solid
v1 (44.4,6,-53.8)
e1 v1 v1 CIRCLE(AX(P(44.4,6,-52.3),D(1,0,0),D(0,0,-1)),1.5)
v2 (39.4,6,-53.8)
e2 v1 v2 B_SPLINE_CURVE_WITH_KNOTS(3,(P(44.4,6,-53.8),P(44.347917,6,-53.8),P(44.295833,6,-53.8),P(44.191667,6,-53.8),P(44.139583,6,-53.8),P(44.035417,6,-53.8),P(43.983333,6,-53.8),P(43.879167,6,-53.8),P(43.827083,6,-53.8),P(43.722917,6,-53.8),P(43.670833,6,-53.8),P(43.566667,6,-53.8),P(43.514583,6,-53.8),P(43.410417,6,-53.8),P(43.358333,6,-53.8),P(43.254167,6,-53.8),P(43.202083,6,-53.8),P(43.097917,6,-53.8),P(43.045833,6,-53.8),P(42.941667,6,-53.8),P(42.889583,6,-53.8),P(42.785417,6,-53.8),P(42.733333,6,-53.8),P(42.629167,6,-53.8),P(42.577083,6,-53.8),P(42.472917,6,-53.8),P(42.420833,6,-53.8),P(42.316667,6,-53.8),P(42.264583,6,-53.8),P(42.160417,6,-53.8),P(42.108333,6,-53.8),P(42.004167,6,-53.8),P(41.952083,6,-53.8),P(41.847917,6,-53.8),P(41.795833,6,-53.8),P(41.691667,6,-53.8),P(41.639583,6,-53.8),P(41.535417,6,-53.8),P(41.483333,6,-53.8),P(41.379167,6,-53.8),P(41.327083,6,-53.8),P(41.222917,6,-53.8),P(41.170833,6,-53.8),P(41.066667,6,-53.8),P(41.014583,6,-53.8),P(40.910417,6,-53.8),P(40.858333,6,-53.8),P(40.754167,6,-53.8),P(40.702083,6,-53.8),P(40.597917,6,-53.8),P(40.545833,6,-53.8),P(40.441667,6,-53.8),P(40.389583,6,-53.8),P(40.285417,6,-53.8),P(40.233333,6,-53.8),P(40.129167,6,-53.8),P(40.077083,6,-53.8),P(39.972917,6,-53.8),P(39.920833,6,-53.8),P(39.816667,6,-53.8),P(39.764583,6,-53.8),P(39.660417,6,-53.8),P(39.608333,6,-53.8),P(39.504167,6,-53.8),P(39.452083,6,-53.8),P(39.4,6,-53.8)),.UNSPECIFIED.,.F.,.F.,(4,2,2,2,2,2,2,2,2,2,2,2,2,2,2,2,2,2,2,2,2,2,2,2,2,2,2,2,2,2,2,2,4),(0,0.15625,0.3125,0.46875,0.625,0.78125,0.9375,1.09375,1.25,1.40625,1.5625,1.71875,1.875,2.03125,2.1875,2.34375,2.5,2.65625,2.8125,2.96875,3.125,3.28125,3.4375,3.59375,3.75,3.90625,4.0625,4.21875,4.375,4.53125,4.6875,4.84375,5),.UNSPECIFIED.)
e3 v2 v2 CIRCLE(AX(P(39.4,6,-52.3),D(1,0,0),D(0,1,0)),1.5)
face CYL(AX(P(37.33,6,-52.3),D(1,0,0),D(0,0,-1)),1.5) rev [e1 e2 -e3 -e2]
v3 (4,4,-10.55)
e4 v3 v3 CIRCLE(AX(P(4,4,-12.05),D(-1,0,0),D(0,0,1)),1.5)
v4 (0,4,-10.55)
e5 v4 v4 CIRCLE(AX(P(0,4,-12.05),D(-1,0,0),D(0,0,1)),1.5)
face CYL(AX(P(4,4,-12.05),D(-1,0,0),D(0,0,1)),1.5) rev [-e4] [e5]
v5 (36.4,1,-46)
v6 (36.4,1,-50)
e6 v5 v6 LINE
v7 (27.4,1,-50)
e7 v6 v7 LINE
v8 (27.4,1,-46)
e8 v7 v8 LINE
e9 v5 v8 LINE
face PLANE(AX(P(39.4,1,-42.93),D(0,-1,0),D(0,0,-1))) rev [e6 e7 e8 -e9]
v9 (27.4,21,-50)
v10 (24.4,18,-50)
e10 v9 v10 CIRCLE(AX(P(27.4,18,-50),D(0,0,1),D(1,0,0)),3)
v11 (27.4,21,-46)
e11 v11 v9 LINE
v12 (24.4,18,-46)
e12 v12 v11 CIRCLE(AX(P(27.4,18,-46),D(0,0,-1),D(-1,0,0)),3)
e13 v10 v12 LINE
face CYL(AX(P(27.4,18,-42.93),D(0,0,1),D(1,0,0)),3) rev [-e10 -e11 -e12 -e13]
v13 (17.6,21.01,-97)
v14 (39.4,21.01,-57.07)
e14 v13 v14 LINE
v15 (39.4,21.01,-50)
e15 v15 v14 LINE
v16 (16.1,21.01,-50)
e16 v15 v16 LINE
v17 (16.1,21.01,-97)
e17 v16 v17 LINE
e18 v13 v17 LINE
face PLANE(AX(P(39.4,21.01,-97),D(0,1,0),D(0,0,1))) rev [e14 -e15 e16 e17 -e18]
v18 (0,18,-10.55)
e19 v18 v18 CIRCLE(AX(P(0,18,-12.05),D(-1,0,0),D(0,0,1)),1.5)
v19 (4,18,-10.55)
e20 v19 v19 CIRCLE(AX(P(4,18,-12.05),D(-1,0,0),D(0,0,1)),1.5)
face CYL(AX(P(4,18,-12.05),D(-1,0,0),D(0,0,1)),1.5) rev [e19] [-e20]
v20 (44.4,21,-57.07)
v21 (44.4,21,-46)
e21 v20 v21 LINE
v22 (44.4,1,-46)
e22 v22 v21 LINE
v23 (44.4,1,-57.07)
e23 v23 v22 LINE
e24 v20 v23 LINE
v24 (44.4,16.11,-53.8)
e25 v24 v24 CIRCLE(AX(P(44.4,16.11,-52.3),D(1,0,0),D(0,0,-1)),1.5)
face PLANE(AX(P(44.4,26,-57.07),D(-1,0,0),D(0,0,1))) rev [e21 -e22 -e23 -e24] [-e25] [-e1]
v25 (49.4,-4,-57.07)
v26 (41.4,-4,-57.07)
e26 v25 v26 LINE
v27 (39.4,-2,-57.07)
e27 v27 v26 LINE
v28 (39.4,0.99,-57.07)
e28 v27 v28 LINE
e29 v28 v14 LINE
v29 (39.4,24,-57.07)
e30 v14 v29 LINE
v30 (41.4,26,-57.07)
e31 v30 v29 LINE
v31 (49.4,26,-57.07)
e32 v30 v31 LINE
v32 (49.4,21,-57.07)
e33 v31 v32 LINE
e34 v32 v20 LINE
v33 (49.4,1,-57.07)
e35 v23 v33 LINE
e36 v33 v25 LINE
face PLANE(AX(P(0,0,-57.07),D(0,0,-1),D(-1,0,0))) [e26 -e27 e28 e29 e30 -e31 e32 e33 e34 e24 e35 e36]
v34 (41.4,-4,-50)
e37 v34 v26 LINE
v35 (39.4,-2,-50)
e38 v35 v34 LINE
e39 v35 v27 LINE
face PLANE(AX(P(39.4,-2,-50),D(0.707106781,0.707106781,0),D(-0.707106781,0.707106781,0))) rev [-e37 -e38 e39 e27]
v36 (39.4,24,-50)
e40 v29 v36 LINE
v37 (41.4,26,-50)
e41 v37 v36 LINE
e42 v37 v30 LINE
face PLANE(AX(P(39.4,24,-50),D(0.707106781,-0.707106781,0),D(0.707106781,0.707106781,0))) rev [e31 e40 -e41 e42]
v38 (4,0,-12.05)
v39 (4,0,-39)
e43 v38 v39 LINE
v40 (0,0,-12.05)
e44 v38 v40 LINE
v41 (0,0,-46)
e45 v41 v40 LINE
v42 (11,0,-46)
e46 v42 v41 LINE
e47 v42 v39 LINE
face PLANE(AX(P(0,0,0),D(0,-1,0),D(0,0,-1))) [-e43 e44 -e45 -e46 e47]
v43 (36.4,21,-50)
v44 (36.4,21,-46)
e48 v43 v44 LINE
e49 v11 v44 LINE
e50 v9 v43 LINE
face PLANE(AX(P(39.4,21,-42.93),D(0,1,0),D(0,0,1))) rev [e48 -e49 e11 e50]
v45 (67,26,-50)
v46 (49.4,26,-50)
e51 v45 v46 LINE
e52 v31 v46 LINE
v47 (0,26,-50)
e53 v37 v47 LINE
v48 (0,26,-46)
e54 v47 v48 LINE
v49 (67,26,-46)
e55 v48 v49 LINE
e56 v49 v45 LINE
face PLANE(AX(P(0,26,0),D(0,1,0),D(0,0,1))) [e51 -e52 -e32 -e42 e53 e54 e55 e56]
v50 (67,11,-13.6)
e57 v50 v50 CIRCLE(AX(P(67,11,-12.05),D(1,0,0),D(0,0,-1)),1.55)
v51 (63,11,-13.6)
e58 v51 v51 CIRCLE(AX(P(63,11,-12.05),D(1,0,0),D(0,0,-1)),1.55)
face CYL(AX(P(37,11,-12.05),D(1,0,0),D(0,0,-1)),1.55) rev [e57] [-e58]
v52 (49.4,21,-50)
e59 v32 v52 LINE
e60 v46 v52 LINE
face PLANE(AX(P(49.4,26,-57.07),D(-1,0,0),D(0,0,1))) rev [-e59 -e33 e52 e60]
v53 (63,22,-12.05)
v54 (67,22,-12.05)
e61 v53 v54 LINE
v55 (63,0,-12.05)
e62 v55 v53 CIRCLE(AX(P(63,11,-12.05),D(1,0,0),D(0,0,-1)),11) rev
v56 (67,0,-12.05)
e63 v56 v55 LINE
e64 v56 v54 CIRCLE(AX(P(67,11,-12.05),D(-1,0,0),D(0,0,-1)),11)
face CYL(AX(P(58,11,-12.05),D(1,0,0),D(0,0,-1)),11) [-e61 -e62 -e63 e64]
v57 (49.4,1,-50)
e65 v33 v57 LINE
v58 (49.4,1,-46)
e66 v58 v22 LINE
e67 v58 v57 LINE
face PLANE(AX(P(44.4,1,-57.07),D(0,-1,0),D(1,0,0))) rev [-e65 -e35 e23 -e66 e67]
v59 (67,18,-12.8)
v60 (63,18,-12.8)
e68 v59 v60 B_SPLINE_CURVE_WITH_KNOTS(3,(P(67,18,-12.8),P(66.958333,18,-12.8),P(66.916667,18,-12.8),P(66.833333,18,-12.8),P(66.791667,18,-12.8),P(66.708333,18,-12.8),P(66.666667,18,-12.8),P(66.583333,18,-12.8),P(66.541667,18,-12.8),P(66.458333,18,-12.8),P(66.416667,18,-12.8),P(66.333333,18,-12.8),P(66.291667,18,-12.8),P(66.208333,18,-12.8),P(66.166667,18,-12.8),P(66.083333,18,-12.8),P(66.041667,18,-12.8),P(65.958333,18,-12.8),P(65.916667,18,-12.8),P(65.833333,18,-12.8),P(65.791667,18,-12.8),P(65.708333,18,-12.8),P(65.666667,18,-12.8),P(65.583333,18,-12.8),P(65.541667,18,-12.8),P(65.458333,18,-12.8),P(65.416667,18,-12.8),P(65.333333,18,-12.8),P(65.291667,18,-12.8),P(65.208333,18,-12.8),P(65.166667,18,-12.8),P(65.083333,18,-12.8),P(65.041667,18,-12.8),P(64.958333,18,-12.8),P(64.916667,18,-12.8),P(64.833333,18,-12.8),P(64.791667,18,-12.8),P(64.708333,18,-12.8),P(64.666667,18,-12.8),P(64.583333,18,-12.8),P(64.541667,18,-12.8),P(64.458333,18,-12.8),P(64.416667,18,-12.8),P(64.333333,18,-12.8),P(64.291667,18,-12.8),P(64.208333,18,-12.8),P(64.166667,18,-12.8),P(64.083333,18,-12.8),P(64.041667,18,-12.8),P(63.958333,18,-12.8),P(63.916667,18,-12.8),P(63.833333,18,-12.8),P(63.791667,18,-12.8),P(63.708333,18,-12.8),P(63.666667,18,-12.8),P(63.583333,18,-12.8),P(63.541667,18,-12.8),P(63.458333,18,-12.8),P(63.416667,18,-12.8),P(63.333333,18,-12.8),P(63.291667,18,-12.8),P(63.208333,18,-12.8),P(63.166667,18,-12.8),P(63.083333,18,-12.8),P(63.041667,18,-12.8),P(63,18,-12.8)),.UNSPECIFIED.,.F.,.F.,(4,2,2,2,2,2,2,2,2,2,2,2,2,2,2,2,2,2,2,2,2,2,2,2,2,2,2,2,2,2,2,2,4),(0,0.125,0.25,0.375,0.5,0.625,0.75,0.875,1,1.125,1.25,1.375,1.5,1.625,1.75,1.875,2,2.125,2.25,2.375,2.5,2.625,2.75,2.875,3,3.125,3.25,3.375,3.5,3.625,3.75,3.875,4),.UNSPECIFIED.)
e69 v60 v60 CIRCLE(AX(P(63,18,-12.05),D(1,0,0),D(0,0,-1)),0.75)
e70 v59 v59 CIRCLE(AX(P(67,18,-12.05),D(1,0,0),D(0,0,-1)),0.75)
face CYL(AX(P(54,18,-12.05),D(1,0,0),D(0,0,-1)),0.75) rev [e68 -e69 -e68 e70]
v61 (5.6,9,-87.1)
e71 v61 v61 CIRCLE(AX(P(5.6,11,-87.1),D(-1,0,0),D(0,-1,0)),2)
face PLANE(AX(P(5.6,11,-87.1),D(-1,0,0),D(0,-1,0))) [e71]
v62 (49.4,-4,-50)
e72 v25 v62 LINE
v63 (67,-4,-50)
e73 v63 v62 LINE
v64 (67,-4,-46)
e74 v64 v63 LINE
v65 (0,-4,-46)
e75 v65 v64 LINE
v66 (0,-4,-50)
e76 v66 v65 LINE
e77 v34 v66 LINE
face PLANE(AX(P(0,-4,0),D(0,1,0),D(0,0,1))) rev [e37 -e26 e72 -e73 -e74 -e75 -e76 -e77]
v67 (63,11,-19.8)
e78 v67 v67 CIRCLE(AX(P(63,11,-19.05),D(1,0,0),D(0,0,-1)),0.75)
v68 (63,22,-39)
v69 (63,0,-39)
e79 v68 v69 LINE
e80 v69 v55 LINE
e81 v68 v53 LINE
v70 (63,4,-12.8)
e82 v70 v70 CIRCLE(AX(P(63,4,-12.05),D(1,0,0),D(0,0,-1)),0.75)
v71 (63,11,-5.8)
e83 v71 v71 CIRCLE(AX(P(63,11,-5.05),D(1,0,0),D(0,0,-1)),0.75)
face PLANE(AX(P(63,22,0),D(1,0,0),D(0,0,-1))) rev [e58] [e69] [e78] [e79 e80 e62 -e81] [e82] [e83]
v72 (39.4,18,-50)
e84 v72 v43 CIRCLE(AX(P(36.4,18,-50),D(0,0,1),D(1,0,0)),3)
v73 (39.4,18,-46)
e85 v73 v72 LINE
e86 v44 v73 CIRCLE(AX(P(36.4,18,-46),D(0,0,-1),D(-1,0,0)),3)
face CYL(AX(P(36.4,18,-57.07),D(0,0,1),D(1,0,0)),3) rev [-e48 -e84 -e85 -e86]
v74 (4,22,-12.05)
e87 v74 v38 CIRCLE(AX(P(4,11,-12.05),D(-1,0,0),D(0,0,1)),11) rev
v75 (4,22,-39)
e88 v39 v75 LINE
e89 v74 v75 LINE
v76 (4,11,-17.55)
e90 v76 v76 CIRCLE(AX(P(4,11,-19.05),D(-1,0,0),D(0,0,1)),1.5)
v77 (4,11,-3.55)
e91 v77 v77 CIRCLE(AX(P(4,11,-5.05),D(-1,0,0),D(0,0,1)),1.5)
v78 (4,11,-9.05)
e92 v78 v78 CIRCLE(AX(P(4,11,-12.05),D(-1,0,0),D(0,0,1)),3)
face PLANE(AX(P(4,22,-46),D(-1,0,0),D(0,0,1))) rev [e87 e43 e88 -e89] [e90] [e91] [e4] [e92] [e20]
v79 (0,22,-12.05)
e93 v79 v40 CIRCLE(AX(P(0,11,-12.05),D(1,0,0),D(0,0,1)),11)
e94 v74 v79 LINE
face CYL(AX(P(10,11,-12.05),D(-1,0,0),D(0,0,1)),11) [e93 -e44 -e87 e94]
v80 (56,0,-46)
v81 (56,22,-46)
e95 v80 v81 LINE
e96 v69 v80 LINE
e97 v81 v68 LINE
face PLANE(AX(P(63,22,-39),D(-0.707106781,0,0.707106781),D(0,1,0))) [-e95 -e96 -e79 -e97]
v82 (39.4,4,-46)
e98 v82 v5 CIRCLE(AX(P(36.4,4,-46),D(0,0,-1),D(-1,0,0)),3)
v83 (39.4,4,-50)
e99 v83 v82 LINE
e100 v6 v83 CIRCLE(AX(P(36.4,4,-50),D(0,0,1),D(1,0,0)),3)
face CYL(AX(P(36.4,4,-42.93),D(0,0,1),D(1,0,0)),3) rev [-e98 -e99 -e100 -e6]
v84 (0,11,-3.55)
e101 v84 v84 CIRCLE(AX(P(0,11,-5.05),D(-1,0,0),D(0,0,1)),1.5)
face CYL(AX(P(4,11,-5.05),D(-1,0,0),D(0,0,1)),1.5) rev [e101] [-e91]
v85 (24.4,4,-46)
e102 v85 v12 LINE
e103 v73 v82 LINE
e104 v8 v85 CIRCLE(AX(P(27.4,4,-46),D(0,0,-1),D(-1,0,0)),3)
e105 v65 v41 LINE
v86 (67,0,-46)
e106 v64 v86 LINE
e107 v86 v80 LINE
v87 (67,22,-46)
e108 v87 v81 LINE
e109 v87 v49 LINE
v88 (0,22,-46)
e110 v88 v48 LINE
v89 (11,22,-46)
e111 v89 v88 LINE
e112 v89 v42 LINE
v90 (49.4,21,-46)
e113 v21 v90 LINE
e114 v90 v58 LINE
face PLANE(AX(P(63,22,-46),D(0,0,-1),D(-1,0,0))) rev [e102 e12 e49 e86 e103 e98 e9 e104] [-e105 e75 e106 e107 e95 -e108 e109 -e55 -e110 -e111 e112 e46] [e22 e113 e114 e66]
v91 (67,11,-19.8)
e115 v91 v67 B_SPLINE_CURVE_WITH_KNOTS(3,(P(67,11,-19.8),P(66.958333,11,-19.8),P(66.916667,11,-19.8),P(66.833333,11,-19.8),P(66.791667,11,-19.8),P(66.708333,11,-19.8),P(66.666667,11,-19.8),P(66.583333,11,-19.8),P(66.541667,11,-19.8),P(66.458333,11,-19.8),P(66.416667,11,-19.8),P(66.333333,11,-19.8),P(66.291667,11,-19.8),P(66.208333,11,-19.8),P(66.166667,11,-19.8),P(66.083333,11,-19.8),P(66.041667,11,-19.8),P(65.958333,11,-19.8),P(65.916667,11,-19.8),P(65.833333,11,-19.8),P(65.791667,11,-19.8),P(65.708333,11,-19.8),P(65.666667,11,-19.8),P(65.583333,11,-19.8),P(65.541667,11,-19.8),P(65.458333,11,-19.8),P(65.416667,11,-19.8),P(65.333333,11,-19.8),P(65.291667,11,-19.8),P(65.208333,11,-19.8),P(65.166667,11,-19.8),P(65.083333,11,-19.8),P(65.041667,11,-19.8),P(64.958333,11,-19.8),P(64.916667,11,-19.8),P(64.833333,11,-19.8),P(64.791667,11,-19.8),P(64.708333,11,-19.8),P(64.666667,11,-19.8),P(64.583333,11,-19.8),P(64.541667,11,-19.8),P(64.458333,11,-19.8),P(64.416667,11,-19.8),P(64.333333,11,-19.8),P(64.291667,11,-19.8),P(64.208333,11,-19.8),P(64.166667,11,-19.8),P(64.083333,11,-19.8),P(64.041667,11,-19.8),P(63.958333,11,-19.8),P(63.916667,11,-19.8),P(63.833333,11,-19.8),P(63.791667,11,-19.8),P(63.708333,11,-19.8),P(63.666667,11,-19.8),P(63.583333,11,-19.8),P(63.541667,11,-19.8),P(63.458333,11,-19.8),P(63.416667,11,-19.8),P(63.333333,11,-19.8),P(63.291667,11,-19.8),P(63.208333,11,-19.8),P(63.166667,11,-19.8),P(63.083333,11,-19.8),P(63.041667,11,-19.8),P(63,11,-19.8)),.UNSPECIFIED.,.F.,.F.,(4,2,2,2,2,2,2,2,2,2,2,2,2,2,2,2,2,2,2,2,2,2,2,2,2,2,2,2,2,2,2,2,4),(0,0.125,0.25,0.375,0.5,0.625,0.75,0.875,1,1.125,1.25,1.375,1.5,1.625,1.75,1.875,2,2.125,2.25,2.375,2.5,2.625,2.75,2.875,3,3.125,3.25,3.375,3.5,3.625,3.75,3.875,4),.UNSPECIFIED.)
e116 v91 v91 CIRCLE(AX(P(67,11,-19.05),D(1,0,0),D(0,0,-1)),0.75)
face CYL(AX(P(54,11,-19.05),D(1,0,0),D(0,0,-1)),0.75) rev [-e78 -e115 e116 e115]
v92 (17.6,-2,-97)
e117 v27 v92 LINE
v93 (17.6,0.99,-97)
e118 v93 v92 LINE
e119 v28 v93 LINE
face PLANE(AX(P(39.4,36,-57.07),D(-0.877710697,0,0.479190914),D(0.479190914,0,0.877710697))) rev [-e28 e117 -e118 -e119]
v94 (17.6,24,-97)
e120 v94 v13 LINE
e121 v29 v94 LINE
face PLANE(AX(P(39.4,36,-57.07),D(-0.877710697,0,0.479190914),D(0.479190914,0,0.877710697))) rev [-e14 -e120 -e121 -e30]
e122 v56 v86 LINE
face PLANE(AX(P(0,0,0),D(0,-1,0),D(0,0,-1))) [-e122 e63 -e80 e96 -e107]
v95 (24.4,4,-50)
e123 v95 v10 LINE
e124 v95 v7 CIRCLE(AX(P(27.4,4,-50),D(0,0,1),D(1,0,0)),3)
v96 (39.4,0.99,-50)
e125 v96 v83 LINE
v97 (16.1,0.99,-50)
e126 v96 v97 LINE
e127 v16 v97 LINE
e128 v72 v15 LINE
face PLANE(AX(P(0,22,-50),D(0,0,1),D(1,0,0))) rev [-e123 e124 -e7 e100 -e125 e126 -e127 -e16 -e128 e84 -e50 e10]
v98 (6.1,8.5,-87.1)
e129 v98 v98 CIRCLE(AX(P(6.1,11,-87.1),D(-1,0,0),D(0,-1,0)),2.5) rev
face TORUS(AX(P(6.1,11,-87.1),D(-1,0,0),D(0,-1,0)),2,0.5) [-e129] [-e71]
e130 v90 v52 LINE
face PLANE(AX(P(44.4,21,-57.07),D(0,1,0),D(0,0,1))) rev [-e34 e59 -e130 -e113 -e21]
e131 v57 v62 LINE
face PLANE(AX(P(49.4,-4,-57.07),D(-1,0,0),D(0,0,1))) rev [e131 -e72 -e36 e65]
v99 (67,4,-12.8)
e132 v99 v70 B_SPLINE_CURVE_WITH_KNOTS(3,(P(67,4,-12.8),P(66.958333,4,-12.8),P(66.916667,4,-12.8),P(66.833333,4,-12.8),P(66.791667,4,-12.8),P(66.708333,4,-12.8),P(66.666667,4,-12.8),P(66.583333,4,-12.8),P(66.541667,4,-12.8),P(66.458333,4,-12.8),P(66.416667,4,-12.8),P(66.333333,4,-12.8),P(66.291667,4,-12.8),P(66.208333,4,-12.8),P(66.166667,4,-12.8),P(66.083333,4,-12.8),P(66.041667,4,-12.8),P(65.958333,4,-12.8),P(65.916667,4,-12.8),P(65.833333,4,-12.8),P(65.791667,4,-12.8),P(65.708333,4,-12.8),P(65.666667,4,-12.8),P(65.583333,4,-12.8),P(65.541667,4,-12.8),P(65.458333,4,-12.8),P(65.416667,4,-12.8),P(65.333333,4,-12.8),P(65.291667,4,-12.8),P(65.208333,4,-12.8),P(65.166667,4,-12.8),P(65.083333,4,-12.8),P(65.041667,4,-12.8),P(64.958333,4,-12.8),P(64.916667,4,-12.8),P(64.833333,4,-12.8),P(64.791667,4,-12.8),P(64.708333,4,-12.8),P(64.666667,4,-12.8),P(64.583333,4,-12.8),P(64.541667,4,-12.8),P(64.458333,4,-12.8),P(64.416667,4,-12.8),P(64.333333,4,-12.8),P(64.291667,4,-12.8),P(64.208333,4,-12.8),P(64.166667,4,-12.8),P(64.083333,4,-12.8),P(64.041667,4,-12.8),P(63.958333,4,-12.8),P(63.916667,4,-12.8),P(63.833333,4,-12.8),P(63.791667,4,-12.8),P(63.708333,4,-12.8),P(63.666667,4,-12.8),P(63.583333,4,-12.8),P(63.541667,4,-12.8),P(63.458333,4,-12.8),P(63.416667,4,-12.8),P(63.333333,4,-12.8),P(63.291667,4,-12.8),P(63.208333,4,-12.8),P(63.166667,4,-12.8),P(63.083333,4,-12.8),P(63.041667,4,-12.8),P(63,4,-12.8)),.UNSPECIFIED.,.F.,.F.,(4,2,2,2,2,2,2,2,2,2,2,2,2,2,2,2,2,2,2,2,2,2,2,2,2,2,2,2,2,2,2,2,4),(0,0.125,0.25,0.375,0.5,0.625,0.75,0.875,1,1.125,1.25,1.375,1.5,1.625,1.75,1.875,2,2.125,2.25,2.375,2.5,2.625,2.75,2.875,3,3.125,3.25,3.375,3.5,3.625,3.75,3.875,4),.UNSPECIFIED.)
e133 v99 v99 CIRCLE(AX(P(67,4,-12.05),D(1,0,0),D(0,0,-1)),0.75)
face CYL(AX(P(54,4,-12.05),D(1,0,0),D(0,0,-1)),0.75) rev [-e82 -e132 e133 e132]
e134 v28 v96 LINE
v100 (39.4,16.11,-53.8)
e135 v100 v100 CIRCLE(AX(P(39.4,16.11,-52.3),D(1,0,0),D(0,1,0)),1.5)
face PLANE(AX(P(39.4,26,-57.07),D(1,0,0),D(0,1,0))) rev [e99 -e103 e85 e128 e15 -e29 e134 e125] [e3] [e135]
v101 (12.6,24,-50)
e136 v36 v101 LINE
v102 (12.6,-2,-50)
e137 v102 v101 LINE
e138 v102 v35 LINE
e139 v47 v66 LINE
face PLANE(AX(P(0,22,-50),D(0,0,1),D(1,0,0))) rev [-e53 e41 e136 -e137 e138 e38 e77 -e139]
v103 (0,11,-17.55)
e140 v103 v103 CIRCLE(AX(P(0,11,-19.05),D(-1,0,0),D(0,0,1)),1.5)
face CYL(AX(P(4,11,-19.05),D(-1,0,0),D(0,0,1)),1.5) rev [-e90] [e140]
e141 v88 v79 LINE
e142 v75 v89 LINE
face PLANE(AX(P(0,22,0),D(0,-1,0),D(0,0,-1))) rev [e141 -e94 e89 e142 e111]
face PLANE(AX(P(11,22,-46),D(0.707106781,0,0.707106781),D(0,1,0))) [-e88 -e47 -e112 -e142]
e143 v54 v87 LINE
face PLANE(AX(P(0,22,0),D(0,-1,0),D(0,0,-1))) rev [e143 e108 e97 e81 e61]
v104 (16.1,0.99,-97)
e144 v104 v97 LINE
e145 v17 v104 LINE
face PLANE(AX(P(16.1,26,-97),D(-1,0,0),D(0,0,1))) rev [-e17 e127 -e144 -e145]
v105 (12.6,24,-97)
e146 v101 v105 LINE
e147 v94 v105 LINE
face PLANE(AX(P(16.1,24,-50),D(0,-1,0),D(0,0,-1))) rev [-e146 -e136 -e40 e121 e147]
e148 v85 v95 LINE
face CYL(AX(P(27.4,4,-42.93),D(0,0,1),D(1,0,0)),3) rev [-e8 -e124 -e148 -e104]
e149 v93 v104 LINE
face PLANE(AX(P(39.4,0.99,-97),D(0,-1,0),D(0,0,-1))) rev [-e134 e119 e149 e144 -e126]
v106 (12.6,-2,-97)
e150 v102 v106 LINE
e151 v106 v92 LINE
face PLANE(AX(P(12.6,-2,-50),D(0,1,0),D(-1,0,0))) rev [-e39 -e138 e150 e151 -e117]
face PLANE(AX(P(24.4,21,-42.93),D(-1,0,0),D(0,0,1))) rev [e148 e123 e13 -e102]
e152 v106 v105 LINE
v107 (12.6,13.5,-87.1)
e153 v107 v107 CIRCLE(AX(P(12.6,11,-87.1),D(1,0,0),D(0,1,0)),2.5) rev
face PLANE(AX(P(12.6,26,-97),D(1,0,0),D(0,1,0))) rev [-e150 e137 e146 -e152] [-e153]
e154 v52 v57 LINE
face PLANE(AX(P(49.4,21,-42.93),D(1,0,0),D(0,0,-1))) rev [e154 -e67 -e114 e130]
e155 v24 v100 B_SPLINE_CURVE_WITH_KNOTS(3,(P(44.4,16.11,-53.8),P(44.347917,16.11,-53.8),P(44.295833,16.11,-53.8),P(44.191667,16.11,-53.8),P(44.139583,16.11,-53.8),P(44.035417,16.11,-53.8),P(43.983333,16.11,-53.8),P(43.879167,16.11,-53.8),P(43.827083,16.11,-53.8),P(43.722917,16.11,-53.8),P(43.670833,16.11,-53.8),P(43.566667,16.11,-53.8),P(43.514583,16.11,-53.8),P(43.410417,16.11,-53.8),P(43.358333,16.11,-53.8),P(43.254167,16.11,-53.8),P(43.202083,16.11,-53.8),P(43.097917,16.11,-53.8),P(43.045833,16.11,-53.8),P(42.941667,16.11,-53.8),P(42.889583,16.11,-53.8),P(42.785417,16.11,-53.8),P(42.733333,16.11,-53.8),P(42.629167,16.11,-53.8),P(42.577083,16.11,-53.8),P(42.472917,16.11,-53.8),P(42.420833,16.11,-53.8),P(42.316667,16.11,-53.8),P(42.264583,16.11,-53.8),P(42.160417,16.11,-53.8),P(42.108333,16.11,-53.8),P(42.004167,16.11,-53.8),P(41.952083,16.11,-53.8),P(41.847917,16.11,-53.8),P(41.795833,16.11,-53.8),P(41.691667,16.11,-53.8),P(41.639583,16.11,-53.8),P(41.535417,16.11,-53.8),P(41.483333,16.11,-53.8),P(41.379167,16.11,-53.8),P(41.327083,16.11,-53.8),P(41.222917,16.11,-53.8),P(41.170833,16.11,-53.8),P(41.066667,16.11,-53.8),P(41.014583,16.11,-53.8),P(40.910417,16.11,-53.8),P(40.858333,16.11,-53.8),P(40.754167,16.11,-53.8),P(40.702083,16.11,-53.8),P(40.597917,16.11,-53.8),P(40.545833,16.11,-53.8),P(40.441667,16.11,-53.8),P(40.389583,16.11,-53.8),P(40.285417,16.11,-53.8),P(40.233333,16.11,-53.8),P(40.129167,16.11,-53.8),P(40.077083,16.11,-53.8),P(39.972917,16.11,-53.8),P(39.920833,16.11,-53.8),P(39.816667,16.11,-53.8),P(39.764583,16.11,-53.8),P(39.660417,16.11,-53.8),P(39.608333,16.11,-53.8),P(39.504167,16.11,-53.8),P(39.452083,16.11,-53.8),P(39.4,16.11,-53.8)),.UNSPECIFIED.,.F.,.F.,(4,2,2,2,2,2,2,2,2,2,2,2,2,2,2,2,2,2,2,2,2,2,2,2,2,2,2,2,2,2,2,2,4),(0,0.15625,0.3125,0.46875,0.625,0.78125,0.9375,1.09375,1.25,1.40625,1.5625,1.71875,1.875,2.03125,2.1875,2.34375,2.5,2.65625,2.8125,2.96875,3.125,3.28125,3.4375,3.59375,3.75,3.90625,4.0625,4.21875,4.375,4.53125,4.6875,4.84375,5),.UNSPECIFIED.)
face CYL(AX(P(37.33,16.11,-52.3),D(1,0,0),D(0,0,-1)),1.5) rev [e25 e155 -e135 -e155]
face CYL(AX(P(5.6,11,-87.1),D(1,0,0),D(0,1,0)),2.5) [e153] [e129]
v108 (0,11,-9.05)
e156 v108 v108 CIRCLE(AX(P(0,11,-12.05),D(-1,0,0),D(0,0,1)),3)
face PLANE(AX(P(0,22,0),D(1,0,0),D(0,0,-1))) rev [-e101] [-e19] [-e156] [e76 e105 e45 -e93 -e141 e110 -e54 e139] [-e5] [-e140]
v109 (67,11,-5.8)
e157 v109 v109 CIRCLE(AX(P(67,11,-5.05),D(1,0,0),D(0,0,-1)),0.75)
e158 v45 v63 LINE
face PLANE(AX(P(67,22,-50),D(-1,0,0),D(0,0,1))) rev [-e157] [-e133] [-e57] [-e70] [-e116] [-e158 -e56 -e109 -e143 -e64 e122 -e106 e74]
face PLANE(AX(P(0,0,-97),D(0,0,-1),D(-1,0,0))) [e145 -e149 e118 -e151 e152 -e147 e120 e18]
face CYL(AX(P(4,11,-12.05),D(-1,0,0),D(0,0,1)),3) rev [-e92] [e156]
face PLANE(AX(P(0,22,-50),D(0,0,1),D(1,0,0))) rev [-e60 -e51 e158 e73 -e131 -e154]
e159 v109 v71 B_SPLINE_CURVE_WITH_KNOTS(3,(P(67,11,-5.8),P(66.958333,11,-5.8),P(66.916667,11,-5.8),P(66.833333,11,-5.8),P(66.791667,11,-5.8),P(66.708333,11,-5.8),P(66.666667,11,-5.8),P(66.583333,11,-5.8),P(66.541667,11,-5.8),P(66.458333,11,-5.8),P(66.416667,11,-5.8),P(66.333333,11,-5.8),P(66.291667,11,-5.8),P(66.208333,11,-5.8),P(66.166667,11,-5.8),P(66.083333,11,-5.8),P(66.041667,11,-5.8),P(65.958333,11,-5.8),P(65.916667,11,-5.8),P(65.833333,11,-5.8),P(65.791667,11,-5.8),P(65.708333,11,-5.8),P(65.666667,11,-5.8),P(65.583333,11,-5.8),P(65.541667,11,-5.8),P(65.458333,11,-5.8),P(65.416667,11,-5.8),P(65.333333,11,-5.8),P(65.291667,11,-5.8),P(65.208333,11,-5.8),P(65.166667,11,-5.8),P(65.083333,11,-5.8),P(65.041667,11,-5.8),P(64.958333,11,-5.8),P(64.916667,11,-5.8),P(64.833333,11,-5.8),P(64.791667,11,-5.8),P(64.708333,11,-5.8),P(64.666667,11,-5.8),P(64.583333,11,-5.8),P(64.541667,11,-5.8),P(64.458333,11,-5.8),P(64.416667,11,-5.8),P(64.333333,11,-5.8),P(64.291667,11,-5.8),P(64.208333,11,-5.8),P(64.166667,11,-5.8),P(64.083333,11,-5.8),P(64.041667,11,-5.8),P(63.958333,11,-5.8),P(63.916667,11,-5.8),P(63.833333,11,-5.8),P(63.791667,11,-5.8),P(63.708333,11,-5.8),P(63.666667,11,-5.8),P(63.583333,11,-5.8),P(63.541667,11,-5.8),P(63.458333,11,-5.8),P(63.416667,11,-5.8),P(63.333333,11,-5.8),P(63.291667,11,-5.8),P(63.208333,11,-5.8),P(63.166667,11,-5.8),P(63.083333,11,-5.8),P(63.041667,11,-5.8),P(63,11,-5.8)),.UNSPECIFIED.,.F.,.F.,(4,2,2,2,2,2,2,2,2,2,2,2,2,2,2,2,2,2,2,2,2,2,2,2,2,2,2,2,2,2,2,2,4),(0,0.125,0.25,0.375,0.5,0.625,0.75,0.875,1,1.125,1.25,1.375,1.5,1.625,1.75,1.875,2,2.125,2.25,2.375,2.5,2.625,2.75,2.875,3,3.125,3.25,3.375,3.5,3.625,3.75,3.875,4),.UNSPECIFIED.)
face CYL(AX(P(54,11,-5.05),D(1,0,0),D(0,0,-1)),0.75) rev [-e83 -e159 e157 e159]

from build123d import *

# Parameters (mm, degrees)
BOSS_EXTRUDE1_DEPTH      = 22
SKETCH3_R                = 1.55
CUT_EXTRUDE1_DEPTH       = 30
CUT_EXTRUDE5_DEPTH       = 9
SKETCH11_R               = 0.75
CUT_EXTRUDE10_DEPTH      = 13
CUT_EXTRUDE11_START      = -10
CUT_EXTRUDE11_DEPTH      = 10
SKETCH13_R               = 3
SKETCH13_R_2             = 1.5
CUT_EXTRUDE12_DEPTH      = 4
FILLET1_SIZE             = 7
SKETCH14_W               = 54
SKETCH14_H               = 9.3
SKETCH14_W_2             = 7.05
SKETCH14_H_2             = 4
BOSS_EXTRUDE4_DEPTH      = 4
SKETCH17_W               = 7.05
SKETCH17_H               = 4
BOSS_EXTRUDE5_DEPTH      = 23.05
BOSS_EXTRUDE6_DEPTH      = 27.3
BOSS_EXTRUDE6_DEPTH_BACK = 4
SKETCH18_W               = 54
SKETCH18_H               = 2.95
SKETCH19_W               = 54
SKETCH19_H               = 2.8
BOSS_EXTRUDE7_DEPTH      = 21
FILLET2_SIZE             = 6.5
FILLET3_SIZE             = 0.5
SKETCH20_R               = 3.970030919
BOSS_EXTRUDE8_DEPTH      = 6
FILLET4_R                = 1
CUT_EXTRUDE13_START      = -37.3
CUT_EXTRUDE13_DEPTH      = 37.3
SKETCH22_W               = 56.118071471
SKETCH22_H               = 11.813110758
CUT_EXTRUDE14_DEPTH      = 56
BOSS_EXTRUDE9_DEPTH      = 4
BOSS_EXTRUDE9_DEPTH_BACK = 26
SKETCH23_W               = 67
SKETCH23_H               = 4
SKETCH25_W               = 5
SKETCH25_H               = 30
BOSS_EXTRUDE10_DEPTH     = 7.07
SKETCH26_W               = 5
SKETCH26_H               = 5
BOSS_EXTRUDE11_DEPTH     = 7.07
SKETCH27_R               = 1.5
CUT_EXTRUDE15_DEPTH      = 7.07
SKETCH28_W               = 5
SKETCH28_H               = 20
SKETCH28_W_2             = 15
CUT_EXTRUDE16_DEPTH      = 7.07
SKETCH29_W               = 3.5
SKETCH29_H               = 30
BOSS_EXTRUDE12_DEPTH     = 47
SKETCH31_W               = 3.5
SKETCH31_H               = 2
CUT_EXTRUDE18_DEPTH      = 47
FILLET8_R                = 3
SKETCH34_W               = 47
SKETCH34_H               = 2.99
BOSS_EXTRUDE14_DEPTH     = 23.3
CUT_EXTRUDE19_DEPTH      = 38
CUT_EXTRUDE20_DEPTH      = 7.07
SKETCH37_R               = 2.5
BOSS_EXTRUDE15_DEPTH     = 7
FILLET10_R               = 0.5


# Read off the part's stored shape, not the designer's step: Cut-Extrude13
with BuildPart() as part:
    # Sketch1 → Boss-Extrude1 (new body)
    with BuildSketch(Plane(origin=(0, 0, 0), x_dir=(1, 0, 0), z_dir=(0, 1, 0))):
        Polygon((0, 0), (0, 50), (67, 50), (67, 0), (63, 0), (63, 46), (4, 46), (4, 0), align=None)
    extrude(amount=BOSS_EXTRUDE1_DEPTH)

    # Sketch3 → Cut-Extrude1 (cut)
    with BuildSketch(Plane(origin=(67, 0, 0), x_dir=(0, 0, -1), z_dir=(1, 0, 0))):
        with Locations((12.05, 11)):
            Circle(SKETCH3_R)
    extrude(amount=-CUT_EXTRUDE1_DEPTH, mode=Mode.SUBTRACT)

    # Sketch5 → Cut-Extrude5 (cut)
    with BuildSketch(Plane(origin=(67, 0, 0), x_dir=(0, 0, -1), z_dir=(1, 0, 0))):
        with BuildLine():
            Line((12.05, 22), (0, 22))
            Line((0, 22), (0, 0))
            Line((0, 0), (12.05, 0))
            ThreePointArc((12.05, 0), (1.05, 11), (12.05, 22))
        make_face()
    extrude(amount=-CUT_EXTRUDE5_DEPTH, mode=Mode.SUBTRACT)

    # Sketch11 → Cut-Extrude10 (cut)
    with BuildSketch(Plane(origin=(67, 0, 0), x_dir=(0, 0, -1), z_dir=(1, 0, 0))):
        with Locations((19.05, 11)):
            Circle(SKETCH11_R)
        with Locations((12.05, 18)):
            Circle(SKETCH11_R)
        with Locations((12.05, 4)):
            Circle(SKETCH11_R)
        with Locations((5.05, 11)):
            Circle(SKETCH11_R)
    extrude(amount=-CUT_EXTRUDE10_DEPTH, mode=Mode.SUBTRACT)

    # Sketch12 → Cut-Extrude11 (cut)
    with BuildSketch(Plane.ZY.offset(CUT_EXTRUDE11_START)):
        with BuildLine():
            Line((-12.05, 22), (0, 22))
            Line((0, 22), (0, 0))
            Line((0, 0), (-12.05, 0))
            ThreePointArc((-12.05, 0), (-1.05, 11), (-12.05, 22))
        make_face()
    extrude(amount=CUT_EXTRUDE11_DEPTH, mode=Mode.SUBTRACT)

    # Sketch13 → Cut-Extrude12 (cut)
    with BuildSketch(Plane.ZY):
        with Locations((-12.05, 11)):
            Circle(SKETCH13_R)
        with Locations((-19.05, 11)):
            Circle(SKETCH13_R_2)
        with Locations((-12.05, 4)):
            Circle(SKETCH13_R_2)
        with Locations((-5.05, 11)):
            Circle(SKETCH13_R_2)
        with Locations((-12.05, 18)):
            Circle(SKETCH13_R_2)
    extrude(amount=-CUT_EXTRUDE12_DEPTH, mode=Mode.SUBTRACT)

    # Fillet1
    fillet1_edges = [part.edges().sort_by_distance(p)[0] for p in [
        (63, 11, -46),
        (4, 11, -46),
    ]]
    chamfer(fillet1_edges, length=FILLET1_SIZE)

    # Sketch14 → Boss-Extrude4 (add)
    with BuildSketch(Plane(origin=(0, 0, -50), x_dir=(-1, 0, 0), z_dir=(0, 0, -1))):
        with Locations((-33.5, -4.65)):
            Rectangle(SKETCH14_W, SKETCH14_H)
        with Locations((-56.975, 20)):
            Rectangle(SKETCH14_W_2, SKETCH14_H_2)
        with Locations((-10.025, 20)):
            Rectangle(SKETCH14_W_2, SKETCH14_H_2)
    extrude(amount=-BOSS_EXTRUDE4_DEPTH)

    # Sketch17 → Boss-Extrude5 (add)
    with BuildSketch(Plane(origin=(0, 0, -50), x_dir=(-1, 0, 0), z_dir=(0, 0, -1))):
        with Locations((-56.975, 20)):
            Rectangle(SKETCH17_W, SKETCH17_H)
        with Locations((-10.025, 20)):
            Rectangle(SKETCH17_W, SKETCH17_H)
    extrude(amount=BOSS_EXTRUDE5_DEPTH)

    # Sketch18 → Boss-Extrude6 (add, two sides: drawn at the far end of the back side and taken through both)
    with BuildSketch(Plane.XZ.offset(-18).offset(-BOSS_EXTRUDE6_DEPTH_BACK)):
        with Locations((33.5, -71.575)):
            Rectangle(SKETCH18_W, SKETCH18_H)
    extrude(amount=BOSS_EXTRUDE6_DEPTH + BOSS_EXTRUDE6_DEPTH_BACK)

    # Sketch19 → Boss-Extrude7 (add)
    with BuildSketch(Plane(origin=(0, 0, -50), x_dir=(-1, 0, 0), z_dir=(0, 0, -1))):
        with Locations((-33.5, -7.9)):
            Rectangle(SKETCH19_W, SKETCH19_H)
    extrude(amount=BOSS_EXTRUDE7_DEPTH)

    # Fillet2
    fillet2_edges = [part.edges().sort_by_distance(p)[0] for p in [
        (60.5, 20, -50),
        (6.5, 20, -50),
    ]]
    chamfer(fillet2_edges, length=FILLET2_SIZE - 0.0001)  # a hair under: the kernel refuses the full size

    # Fillet3
    fillet3_edges = [part.edges().sort_by_distance(p)[0] for p in [
        (60.5, 6.35, -73.05),
        (6.5, 6.35, -73.05),
    ]]
    chamfer(fillet3_edges, length=FILLET3_SIZE)

    # Sketch20 → Boss-Extrude8 (add)
    with BuildSketch(Plane.XZ.offset(9.3)):
        with Locations(Location((23.4, -59.65, 0), (0, 0, 270))):
            Circle(SKETCH20_R)
    extrude(amount=BOSS_EXTRUDE8_DEPTH)

    # Fillet4
    fillet4_edges = [part.edges().sort_by_distance(p)[0] for p in [
        (23.4, -15.3, -55.679969081),
    ]]
    fillet(fillet4_edges, radius=FILLET4_R)

    # Cut-Extrude13 outline → Cut-Extrude13 (cut)
    with BuildSketch(Plane(origin=(0, 22, 0), x_dir=(1, 0, 0), z_dir=(0, 1, 0)).offset(CUT_EXTRUDE13_START)):
        Polygon((67, 50), (60.5, 56.5), (60.5, 72.55), (60, 73.05), (7, 73.05), (6.5, 72.55), (6.5, 56.5), (0, 50), align=None)
    extrude(amount=CUT_EXTRUDE13_DEPTH, mode=Mode.SUBTRACT)

    # Sketch22 → Cut-Extrude14 (cut)
    with BuildSketch(Plane(origin=(0, 0, -50), x_dir=(-1, 0, 0), z_dir=(0, 0, -1))):
        with Locations((-32.440964265, -5.906555379)):
            Rectangle(SKETCH22_W, SKETCH22_H)
    extrude(amount=-CUT_EXTRUDE14_DEPTH, mode=Mode.SUBTRACT)

    # Sketch23 → Boss-Extrude9 (add, two sides: drawn at the far end of the back side and taken through both)
    with BuildSketch(Plane(origin=(0, 22, 0), x_dir=(1, 0, 0), z_dir=(0, 1, 0)).offset(-BOSS_EXTRUDE9_DEPTH_BACK)):
        with Locations((33.5, 48)):
            Rectangle(SKETCH23_W, SKETCH23_H)
    extrude(amount=BOSS_EXTRUDE9_DEPTH + BOSS_EXTRUDE9_DEPTH_BACK)

    # Sketch25 → Boss-Extrude10 (add)
    with BuildSketch(Plane(origin=(0, 0, -50), x_dir=(-1, 0, 0), z_dir=(0, 0, -1))):
        with Locations((-41.9, 11)):
            Rectangle(SKETCH25_W, SKETCH25_H)
    extrude(amount=BOSS_EXTRUDE10_DEPTH)

    # Sketch26 → Boss-Extrude11 (add)
    with BuildSketch(Plane(origin=(0, 0, -50), x_dir=(-1, 0, 0), z_dir=(0, 0, -1))):
        with Locations((-46.9, 23.5)):
            Rectangle(SKETCH26_W, SKETCH26_H)
        with Locations((-46.9, -1.5)):
            Rectangle(SKETCH26_W, SKETCH26_H)
    extrude(amount=BOSS_EXTRUDE11_DEPTH)

    # Sketch27 → Cut-Extrude15 (cut)
    with BuildSketch(Plane(origin=(44.4, 0, 0), x_dir=(0, 0, -1), z_dir=(1, 0, 0))):
        with Locations((52.3, 6)):
            Circle(SKETCH27_R)
        with Locations((52.3, 16.11)):
            Circle(SKETCH27_R)
    extrude(amount=-CUT_EXTRUDE15_DEPTH, mode=Mode.SUBTRACT)

    # Sketch28 → Cut-Extrude16 (cut)
    with BuildSketch(Plane(origin=(0, 0, -50), x_dir=(-1, 0, 0), z_dir=(0, 0, -1))):
        with Locations((-46.9, 11)):
            Rectangle(SKETCH28_W, SKETCH28_H)
        with Locations((-31.9, 11)):
            Rectangle(SKETCH28_W_2, SKETCH28_H)
    extrude(amount=-CUT_EXTRUDE16_DEPTH, mode=Mode.SUBTRACT)

    # Sketch29 → Boss-Extrude12 (add)
    with BuildSketch(Plane(origin=(0, 0, -50), x_dir=(-1, 0, 0), z_dir=(0, 0, -1))):
        with Locations((-14.35, 11)):
            Rectangle(SKETCH29_W, SKETCH29_H)
    extrude(amount=BOSS_EXTRUDE12_DEPTH)

    # Sketch31 → Cut-Extrude18 (cut)
    with BuildSketch(Plane(origin=(0, 0, -97), x_dir=(-1, 0, 0), z_dir=(0, 0, -1))):
        with Locations((-14.35, 25)):
            Rectangle(SKETCH31_W, SKETCH31_H)
        with Locations((-14.35, -3)):
            Rectangle(SKETCH31_W, SKETCH31_H)
    extrude(amount=-CUT_EXTRUDE18_DEPTH, mode=Mode.SUBTRACT)

    # Fillet8
    fillet8_edges = [part.edges().sort_by_distance(p)[0] for p in [
        (39.4, 1, -48),
        (39.4, 21, -48),
        (24.4, 21, -48),
        (24.4, 1, -48),
    ]]
    fillet(fillet8_edges, radius=FILLET8_R)

    # Sketch34 → Boss-Extrude14 (add)
    with BuildSketch(Plane(origin=(16.1, 0, 0), x_dir=(0, 0, -1), z_dir=(1, 0, 0))):
        with Locations((73.5, 22.505)):
            Rectangle(SKETCH34_W, SKETCH34_H)
        with Locations((73.5, -0.505)):
            Rectangle(SKETCH34_W, SKETCH34_H)
    extrude(amount=BOSS_EXTRUDE14_DEPTH)

    # Sketch35 → Cut-Extrude19 (cut)
    with BuildSketch(Plane.XZ.offset(2)):
        Polygon((39.4, -57.07), (17.6, -97), (39.4, -97), align=None)
    extrude(amount=-CUT_EXTRUDE19_DEPTH, mode=Mode.SUBTRACT)

    # Sketch36 → Cut-Extrude20 (cut)
    with BuildSketch(Plane(origin=(0, 0, -57.07), x_dir=(-1, 0, 0), z_dir=(0, 0, -1))):
        Polygon((-39.4, 24), (-41.4, 26), (-39.4, 26), align=None)
        Polygon((-39.4, -2), (-39.4, -4), (-41.4, -4), align=None)
    extrude(amount=-CUT_EXTRUDE20_DEPTH, mode=Mode.SUBTRACT)

    # Sketch37 → Boss-Extrude15 (add)
    with BuildSketch(Plane.ZY.offset(-12.6)):
        with Locations(Location((-87.1, 11, 0), (0, 0, 90))):
            Circle(SKETCH37_R)
    extrude(amount=BOSS_EXTRUDE15_DEPTH)

    # Fillet10
    fillet10_edges = [part.edges().sort_by_distance(p)[0] for p in [
        (5.6, 8.5, -87.1),
    ]]
    fillet(fillet10_edges, radius=FILLET10_R)


solid = part.part
